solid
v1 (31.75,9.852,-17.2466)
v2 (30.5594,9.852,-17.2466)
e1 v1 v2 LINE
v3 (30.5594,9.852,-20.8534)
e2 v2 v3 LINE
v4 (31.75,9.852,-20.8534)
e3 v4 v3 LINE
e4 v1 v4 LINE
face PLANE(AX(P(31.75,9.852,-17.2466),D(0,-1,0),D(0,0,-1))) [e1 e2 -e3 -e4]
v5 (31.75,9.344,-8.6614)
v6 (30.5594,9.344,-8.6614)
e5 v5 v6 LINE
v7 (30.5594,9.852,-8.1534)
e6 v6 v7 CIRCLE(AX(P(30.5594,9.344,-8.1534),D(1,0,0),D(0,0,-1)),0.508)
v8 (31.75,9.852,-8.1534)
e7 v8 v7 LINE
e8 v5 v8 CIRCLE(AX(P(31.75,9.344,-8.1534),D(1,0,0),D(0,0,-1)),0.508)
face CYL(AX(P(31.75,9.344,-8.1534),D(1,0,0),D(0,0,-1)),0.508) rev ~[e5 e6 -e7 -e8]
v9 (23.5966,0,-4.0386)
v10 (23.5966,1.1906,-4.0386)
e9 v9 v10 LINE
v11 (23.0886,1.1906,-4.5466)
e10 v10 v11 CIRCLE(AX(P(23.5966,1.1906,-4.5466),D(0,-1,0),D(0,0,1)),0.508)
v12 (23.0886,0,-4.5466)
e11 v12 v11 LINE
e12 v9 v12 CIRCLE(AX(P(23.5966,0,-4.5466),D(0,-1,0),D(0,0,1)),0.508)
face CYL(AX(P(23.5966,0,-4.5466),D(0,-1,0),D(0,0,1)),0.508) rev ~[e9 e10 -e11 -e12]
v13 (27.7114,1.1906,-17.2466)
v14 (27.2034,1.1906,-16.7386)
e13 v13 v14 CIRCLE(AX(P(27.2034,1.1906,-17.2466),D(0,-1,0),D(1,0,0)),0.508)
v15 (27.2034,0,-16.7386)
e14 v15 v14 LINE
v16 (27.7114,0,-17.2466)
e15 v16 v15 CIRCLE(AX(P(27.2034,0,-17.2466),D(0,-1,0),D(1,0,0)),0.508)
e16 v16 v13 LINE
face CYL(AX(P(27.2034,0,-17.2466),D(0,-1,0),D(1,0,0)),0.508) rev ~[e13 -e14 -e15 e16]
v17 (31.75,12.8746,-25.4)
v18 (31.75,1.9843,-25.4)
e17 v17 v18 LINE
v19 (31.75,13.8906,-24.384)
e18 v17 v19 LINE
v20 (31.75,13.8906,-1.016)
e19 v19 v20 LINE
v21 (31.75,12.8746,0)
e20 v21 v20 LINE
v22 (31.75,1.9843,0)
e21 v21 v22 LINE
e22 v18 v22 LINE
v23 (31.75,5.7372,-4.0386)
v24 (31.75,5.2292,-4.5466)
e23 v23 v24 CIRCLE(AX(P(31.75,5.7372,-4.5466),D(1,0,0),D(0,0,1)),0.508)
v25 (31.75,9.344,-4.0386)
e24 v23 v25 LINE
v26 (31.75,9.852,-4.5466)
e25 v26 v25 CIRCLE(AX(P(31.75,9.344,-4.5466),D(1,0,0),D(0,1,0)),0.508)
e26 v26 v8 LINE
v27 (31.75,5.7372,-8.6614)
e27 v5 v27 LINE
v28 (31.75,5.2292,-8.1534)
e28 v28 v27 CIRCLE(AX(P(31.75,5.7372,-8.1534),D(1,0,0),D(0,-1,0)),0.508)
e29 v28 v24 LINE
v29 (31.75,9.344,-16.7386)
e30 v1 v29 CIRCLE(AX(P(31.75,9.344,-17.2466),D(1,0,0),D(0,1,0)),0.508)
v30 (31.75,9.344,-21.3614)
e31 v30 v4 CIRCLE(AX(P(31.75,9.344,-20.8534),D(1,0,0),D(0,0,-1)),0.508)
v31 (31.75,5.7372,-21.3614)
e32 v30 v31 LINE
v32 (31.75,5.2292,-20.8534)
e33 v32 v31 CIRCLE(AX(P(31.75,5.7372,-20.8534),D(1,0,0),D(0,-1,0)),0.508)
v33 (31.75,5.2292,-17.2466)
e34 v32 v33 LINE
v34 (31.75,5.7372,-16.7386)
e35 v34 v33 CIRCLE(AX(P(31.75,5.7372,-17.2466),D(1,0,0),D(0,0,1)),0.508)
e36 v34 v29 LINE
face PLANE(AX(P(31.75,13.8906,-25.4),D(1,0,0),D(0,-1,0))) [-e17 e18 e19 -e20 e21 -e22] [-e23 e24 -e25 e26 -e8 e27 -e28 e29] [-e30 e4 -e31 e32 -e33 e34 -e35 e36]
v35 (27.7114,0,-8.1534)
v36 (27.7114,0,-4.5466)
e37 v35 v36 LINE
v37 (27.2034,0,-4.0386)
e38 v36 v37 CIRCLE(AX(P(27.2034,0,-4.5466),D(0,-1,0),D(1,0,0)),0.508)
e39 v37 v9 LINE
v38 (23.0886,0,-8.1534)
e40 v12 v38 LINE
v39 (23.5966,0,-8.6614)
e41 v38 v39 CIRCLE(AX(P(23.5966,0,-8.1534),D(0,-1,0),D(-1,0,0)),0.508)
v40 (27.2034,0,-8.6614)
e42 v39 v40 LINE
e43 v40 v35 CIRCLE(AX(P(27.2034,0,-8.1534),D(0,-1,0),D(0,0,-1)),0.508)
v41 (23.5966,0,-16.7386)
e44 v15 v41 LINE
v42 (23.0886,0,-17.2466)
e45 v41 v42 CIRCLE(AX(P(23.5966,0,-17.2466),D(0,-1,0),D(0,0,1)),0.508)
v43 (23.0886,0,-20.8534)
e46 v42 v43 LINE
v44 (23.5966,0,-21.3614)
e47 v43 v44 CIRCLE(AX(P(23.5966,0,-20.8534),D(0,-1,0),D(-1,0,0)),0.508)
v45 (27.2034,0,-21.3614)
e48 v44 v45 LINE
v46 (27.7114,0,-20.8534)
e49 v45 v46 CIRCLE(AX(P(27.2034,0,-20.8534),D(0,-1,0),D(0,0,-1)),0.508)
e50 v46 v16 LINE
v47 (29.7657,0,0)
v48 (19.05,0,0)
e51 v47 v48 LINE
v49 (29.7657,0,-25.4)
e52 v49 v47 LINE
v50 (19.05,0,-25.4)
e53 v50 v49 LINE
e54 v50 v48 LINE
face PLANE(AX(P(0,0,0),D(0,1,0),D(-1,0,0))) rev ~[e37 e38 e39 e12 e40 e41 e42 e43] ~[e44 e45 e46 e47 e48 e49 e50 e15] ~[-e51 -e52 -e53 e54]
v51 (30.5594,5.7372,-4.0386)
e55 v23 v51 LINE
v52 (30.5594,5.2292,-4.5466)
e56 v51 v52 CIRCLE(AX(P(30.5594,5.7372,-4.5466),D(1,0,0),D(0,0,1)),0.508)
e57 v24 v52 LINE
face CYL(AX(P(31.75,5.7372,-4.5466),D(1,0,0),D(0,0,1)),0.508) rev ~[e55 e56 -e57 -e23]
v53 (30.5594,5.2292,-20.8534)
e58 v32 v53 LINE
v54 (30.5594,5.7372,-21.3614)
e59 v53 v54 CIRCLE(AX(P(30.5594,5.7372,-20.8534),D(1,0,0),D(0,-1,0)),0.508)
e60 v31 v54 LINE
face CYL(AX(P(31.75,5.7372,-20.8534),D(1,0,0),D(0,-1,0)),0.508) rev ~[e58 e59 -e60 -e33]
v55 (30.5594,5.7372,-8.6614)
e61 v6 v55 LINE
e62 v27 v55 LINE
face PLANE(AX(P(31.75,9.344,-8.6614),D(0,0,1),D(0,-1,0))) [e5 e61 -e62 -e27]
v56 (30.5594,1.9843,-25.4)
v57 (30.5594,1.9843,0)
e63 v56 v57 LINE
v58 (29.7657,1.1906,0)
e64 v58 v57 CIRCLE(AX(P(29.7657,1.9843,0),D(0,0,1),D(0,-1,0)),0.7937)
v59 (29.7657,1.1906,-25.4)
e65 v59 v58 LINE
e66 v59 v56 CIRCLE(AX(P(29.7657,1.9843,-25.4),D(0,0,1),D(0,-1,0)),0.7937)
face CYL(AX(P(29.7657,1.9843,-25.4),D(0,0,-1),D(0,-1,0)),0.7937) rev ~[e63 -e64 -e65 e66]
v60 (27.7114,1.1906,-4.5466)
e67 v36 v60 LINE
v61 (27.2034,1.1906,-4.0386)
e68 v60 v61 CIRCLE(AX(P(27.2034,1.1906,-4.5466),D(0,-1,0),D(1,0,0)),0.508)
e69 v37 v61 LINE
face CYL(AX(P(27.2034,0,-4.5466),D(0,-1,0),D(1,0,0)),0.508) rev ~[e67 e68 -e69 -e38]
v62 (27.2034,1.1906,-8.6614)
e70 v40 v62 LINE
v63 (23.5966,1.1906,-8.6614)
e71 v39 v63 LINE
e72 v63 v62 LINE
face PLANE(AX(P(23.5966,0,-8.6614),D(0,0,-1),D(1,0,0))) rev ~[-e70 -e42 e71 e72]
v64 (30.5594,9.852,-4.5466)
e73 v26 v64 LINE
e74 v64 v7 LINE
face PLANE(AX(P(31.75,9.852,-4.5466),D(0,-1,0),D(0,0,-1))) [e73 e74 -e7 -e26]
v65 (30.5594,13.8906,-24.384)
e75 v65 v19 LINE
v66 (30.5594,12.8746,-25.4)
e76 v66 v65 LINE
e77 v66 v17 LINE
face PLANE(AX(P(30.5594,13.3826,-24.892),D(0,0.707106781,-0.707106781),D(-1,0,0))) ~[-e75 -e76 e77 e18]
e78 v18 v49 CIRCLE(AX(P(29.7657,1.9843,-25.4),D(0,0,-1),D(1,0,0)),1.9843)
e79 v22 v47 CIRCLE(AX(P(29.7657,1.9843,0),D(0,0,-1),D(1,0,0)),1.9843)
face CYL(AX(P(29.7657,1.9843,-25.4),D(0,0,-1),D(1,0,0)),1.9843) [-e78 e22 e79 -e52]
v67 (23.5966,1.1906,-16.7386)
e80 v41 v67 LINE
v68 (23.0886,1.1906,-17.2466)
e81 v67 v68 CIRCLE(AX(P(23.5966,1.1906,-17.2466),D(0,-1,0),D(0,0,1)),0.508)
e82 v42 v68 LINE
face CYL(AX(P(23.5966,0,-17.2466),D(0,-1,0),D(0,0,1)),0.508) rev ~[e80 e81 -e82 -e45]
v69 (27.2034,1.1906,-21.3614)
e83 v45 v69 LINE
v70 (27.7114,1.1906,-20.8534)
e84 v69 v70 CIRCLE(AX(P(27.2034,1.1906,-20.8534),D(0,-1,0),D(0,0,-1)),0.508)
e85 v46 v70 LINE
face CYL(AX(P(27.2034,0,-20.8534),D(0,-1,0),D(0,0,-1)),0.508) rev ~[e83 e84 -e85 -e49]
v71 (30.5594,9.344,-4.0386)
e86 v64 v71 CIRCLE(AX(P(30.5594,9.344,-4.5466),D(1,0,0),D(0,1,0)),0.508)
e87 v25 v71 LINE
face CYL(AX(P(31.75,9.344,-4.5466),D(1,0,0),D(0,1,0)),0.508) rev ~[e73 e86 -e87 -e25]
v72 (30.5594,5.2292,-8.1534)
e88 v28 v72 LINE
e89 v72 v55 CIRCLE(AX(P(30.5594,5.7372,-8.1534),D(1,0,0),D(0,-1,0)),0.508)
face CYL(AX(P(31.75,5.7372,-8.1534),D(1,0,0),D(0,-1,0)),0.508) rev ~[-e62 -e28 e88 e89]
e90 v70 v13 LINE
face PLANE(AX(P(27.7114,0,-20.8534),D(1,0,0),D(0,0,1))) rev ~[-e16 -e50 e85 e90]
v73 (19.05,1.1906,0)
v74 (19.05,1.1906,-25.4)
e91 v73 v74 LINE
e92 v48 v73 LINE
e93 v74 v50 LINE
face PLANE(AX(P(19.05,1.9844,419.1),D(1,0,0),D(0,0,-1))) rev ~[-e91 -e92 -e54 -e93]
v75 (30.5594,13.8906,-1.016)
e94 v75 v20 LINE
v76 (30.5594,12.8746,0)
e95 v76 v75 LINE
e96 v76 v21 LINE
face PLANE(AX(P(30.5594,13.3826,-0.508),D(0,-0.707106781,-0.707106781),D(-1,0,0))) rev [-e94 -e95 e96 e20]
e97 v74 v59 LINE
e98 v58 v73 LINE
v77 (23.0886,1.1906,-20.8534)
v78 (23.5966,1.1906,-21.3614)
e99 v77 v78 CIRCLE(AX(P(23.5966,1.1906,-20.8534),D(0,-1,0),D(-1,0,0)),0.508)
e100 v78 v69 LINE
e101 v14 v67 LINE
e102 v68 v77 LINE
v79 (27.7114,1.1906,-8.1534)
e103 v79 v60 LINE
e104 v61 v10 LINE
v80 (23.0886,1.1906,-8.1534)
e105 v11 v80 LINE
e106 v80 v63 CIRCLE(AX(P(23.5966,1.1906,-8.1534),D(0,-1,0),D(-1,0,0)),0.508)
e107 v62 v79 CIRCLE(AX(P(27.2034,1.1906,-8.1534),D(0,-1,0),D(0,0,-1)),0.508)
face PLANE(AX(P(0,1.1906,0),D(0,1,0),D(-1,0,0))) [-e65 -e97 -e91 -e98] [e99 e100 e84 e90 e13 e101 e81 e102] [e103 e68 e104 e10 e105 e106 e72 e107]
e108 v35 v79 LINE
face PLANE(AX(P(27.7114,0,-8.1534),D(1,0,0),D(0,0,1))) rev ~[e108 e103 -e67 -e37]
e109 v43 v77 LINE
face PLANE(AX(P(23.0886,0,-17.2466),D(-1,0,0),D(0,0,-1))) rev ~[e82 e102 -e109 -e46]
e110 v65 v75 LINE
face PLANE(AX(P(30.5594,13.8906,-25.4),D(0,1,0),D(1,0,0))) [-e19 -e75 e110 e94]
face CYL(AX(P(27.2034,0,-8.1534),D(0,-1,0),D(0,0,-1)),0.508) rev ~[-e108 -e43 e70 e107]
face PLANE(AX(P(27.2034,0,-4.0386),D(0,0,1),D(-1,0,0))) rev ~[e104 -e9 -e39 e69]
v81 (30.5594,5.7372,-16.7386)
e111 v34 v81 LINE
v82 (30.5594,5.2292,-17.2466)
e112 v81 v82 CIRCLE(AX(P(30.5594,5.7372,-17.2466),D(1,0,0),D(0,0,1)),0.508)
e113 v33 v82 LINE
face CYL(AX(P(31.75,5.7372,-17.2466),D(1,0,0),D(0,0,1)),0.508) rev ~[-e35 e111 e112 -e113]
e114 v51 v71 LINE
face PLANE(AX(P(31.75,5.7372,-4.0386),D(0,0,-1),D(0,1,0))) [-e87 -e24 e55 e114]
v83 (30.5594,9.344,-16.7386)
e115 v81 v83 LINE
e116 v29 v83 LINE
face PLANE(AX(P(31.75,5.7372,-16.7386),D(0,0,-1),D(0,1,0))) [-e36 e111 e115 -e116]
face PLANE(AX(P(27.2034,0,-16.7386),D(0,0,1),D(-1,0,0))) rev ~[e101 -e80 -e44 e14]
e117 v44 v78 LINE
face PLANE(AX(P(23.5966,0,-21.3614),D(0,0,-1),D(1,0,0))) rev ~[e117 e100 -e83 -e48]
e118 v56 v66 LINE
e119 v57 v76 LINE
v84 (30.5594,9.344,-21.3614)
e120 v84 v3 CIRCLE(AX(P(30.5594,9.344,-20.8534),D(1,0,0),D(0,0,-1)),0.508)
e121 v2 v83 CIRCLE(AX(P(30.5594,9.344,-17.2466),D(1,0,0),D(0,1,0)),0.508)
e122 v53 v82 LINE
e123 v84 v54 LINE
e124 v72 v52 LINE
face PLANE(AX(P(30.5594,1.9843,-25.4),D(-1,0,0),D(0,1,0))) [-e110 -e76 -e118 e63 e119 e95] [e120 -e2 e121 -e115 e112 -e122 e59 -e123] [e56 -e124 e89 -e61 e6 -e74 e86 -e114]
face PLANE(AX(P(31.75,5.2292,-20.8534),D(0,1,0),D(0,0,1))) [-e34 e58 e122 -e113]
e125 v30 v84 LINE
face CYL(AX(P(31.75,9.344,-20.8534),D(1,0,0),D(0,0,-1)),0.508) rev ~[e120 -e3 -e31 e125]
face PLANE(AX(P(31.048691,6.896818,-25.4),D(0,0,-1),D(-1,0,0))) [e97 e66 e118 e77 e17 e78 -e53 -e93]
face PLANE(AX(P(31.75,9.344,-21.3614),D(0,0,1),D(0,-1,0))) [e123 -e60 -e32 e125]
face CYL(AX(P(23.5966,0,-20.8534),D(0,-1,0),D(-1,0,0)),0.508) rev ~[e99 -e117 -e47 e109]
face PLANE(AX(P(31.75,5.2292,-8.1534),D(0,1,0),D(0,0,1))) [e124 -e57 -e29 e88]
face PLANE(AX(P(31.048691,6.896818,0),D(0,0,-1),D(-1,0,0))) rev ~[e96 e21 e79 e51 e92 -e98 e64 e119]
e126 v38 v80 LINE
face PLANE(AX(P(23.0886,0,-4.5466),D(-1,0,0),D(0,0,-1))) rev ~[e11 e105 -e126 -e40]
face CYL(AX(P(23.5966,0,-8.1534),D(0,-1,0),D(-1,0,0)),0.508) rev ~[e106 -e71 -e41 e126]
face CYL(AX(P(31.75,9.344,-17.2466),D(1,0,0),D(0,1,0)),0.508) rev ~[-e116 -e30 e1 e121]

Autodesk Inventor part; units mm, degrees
ref_plane "YZ Plane" through (0, 0, 0) normal (1, 0, 0) x (0, 1, 0)
ref_plane "XZ Plane" through (0, 0, 0) normal (0, 1, 0) x (-1, 0, 0)
sketch "Sketch1" plane through (0, 0, 0) normal (0, 1, 0) x (-1, 0, 0)
  line L0 (-31.75, 0) -> (31.75, 0)
  line L1 (31.75, 0) -> (31.75, -25.4)
  line L2 (31.75, -25.4) -> (-31.75, -25.4)
  line L3 (-31.75, -25.4) -> (-31.75, 0)
  line L4 (31.75, 0) -> (-31.75, -25.4) construction
  point P0 (0, 0)
  point P1 (0, 0)
  dimension "d0" = 63.5
  dimension "d1" = 25.4
extrude "Plate1" add sketch "Sketch1" along normal blind 1.1906
sketch "Sketch2" plane through (30.5594, 0, -25.4) normal (1, 0, 0) x (0, 1, 0)
  line L0 (0, 25.4) -> (0, 0)
  line L1 (0, 0) -> (13.8906, 0)
  line L2 (13.8906, 0) -> (13.8906, 25.4)
  line L3 (13.8906, 25.4) -> (0, 25.4)
edge flange "Flanges" height 12.7 angle 90 thickness 1.1906 bend radius 0.7937 thickness toward (1, 0, 0) relief tear relief width 1.1906 relief depth 0.5953 corner gap 1.1906 corner form 0 edges at (31.75, 1.1906, -12.7) (-31.75, 1.1906, -12.7) wall of the first edge with corners at (30.5594, 0, 0) (30.5594, 0, -25.4) (30.5594, 13.8906, -25.4) (30.5594, 13.8906, 0)
bend "Bend1"
corner "Corner1"
sketch "Sketch3" plane through (31.75, 1.9844, -25.4) normal (1, 0, 0) x (0, 0, -1)
  line L0 (-20.8534, 7.8676) -> (-17.2466, 7.8676)
  line L1 (-16.7386, 7.3596) -> (-16.7386, 3.7528)
  line L2 (-17.2466, 3.2448) -> (-20.8534, 3.2448)
  line L3 (-21.3614, 3.7528) -> (-21.3614, 7.3596)
  arc A0 (-20.8534, 7.8676) -> (-21.3614, 7.3596) centre (-20.8534, 7.3596) ccw
  arc A1 (-16.7386, 7.3596) -> (-17.2466, 7.8676) centre (-17.2466, 7.3596) ccw
  arc A2 (-17.2466, 3.2448) -> (-16.7386, 3.7528) centre (-17.2466, 3.7528) ccw
  arc A3 (-21.3614, 3.7528) -> (-20.8534, 3.2448) centre (-20.8534, 3.7528) ccw
  line L4 (-25.4, 0) -> (-25.4, 11.9062) construction
  line L5 (-25.4, 11.9062) -> (0, 11.9063) construction
  line L6 (-20.8534, 7.3596) -> (-17.2466, 3.7528) construction
  point P0 (-25.4, -1.9844)
  point P1 (-16.7386, 3.2448)
  point P2 (-21.3614, 3.2448)
  point P3 (-19.05, 5.5562)
  dimension "d16" = 4.6228
  dimension "d17" = 0.508
  dimension "d20" = 6.35
  dimension "d21" = 6.35
extrude "Flange Stamp" cut sketch "Sketch3" against normal blind 1.1906
sketch "Sketch7" plane through (31.75, 1.9844, 0) normal (1, 0, 0) x (0, 0, -1)
  arc A0 (4.5466, 7.8676) -> (4.0386, 7.3596) centre (4.5466, 7.3596) ccw construction
  arc A1 (8.1534, 3.2448) -> (8.6614, 3.7528) centre (8.1534, 3.7528) ccw construction
  circle A2 centre (6.35, 5.5563) radius 2.1844
  line L0 (4.5466, 7.3596) -> (8.1534, 3.7528) construction
  point P0 (0, -1.9844)
  dimension "d46" = 4.3688
surface extrude "Flange Circle" sketch "Sketch7" against normal up to surface (1.1906 mm away) shown yes curves A2
ref_plane "Flange Pattern Plane" through (31.75, 7.5406, -4.5466) normal (0, 1, 0) x (1, 0, 0)
sketch "Flange Pattern Sketch" plane through (31.75, 7.5406, -4.5466) normal (0, 1, 0) x (1, 0, 0)
  line L0 (0, 3.6068) -> (0, 0) construction
  line L1 (-76.2822, -4.5466) -> (13.1932, -4.5466) construction
  line L2 (0, 0) -> (-1.1906, 0) construction
  point P0 (-31.75, -4.5466)
  point P1 (0, 1.8034)
  point P2 (0, 14.5034)
  dimension "d131" = 12.7
  dimension "d134" = 12.7
pattern_sketch "Flange Pattern" of "Flange Circle", "Flange Stamp" from (31.75, 7.5406, -6.35) copies at (31.75, 7.5406, -19.05)
sketch "Sketch8" plane through (0, 0, 0) normal (0, -1, 0) x (1, 0, 0)
  line L0 (29.7656, 0) -> (-29.7656, 0) construction
  line L1 (27.2034, -4.0386) -> (23.5966, -4.0386)
  line L2 (23.0886, -4.5466) -> (23.0886, -8.1534)
  line L3 (23.5966, -8.6614) -> (27.2034, -8.6614)
  line L4 (27.7114, -8.1534) -> (27.7114, -4.5466)
  arc A0 (27.7114, -4.5466) -> (27.2034, -4.0386) centre (27.2034, -4.5466) ccw
  arc A1 (27.2034, -8.6614) -> (27.7114, -8.1534) centre (27.2034, -8.1534) ccw
  arc A2 (23.0886, -8.1534) -> (23.5966, -8.6614) centre (23.5966, -8.1534) ccw
  arc A3 (23.5966, -4.0386) -> (23.0886, -4.5466) centre (23.5966, -4.5466) ccw
  line L5 (27.2034, -4.5466) -> (23.5966, -8.1534) construction
  line L6 (31.75, 0) -> (31.75, -25.4) construction
  point P0 (0, 0)
  point P1 (23.0886, -8.6614)
  point P2 (27.7114, -8.6614)
  point P3 (25.4, -6.35)
  dimension "d49" = 4.6228
  dimension "d50" = 0.508
  dimension "d51" = 6.35
  dimension "d52" = 6.35
extrude "Body Stamp" cut sketch "Sketch8" against normal blind 1.1906
sketch "Sketch9" plane through (0, 0, 0) normal (0, -1, 0) x (1, 0, 0)
  arc A0 (27.7114, -4.5466) -> (27.2034, -4.0386) centre (27.2034, -4.5466) ccw construction
  arc A1 (23.0886, -8.1534) -> (23.5966, -8.6614) centre (23.5966, -8.1534) ccw construction
  line L0 (27.2034, -4.5466) -> (23.5966, -8.1534) construction
  circle A2 centre (25.4, -6.35) radius 2.1844
  point P0 (0, 0)
  dimension "d55" = 4.3688
surface extrude "Body Circle" sketch "Sketch9" against normal up to surface (1.1906 mm away) shown yes curves A2
sketch "Body Pattern Sketch" plane through (0, 0, 0) normal (0, -1, 0) x (1, 0, 0)
  line L0 (29.7656, 0) -> (-29.7656, 0) construction
  line L1 (31.75, 0) -> (31.75, -25.4) construction
  circle A0 centre (25.4, -6.35) radius 2.1844 construction
  point P0 (0, 0)
  point P1 (25.4, -19.05)
  dimension "d62" = 12.7
  dimension "d65" = 12.7
  dimension "d139" = 12.7
pattern_sketch "Body Pattern" of "Body Stamp", "Body Circle" from (25.4, 0, -6.35) copies at (25.4, 0, -19.05)
sketch "Arc Length" plane through (30.5594, 1.9844, 0) normal (0, 0, 1) x (1, 0, 0)
  line L0 (0, 0) -> (1.1906, 0) construction
  arc A0 (-0.7938, -0.7938) -> (0, 0) centre (-0.7938, 0) ccw construction
  line L1 (-0.7938, -1.9844) -> (-0.7938, -0.7938) construction
  arc A1 (-0.7938, -1.9844) -> (1.1906, 0) centre (-0.7938, 0) ccw construction
  point P0 (-30.5594, -1.9844)
  dimension "d85" = 3.117
  dimension "d92" = 1.2468
sketch "Sketch13" plane through (31.75, 13.8906, 0) normal (1, 0, 0) x (0, 0, -1)
  line L0 (0, 0) -> (25.4, 0) construction
  line L1 (62.4078, 0) -> (63.4238, -1.016)
  line L2 (63.4238, -1.016) -> (64.4398, 0)
  line L3 (62.4078, 0) -> (64.4398, 0)
  line L4 (25.4, -11.9063) -> (0, -11.9063) construction
  line L5 (63.4238, -10.8903) -> (61.3168, -12.9972)
  line L6 (61.3168, -12.9972) -> (63.4238, -15.1042)
  line L7 (63.4238, -15.1042) -> (65.5308, -12.9972)
  line L8 (65.5308, -12.9972) -> (63.4238, -10.8903)
  line L9 (63.4238, -10.8903) -> (63.4238, -15.1042) construction
  line L10 (63.4238, -1.016) -> (63.4238, -10.8903) construction
  line L11 (0, -11.9063) -> (25.4, -11.9063) construction
  point P0 (0, -13.8906)
  dimension "d86" = 4.2139
  dimension "d88" = 1.016
  dimension "d91" = 1.016
  dimension "d102" = 63.4238
feature "Notch" [suppressed]
mirror "Notch Mirror" [suppressed]
pattern_linear "Notch Pattern" [suppressed]
chamfer "End Chamfer" distance 1.016 angle 45 4 edges at (-31.1547, 13.8906, -25.4) (31.1547, 13.8906, -25.4) (-31.1547, 13.8906, 0) (31.1547, 13.8906, 0)
sketch "Sketch14" plane through (-31.75, 1.9844, 419.1) normal (1, 0, 0) x (0, 0, -1)
  line L0 (419.1, 11.9063) -> (444.5, 11.9063) construction
  line L1 (419.1, 0) -> (419.1, 11.9063) construction
  line L2 (419.1, -1.9844) -> (444.5, -1.9844) construction
  line L3 (419.1, 11.9063) -> (444.5, 11.9063)
  line L4 (444.5, 11.9063) -> (444.5, -1.9844)
  line L5 (444.5, -1.9844) -> (419.1, -1.9844)
  line L6 (419.1, -1.9844) -> (419.1, 11.9063)
  point P0 (382.0521, -1.9844)
extrude "Half Cut" cut sketch "Sketch14" along normal blind 50.8
equation "\"d1\" = 12.7 * Length"
equation "\"d18\" = Thickness"
equation "\"d53\" = Thickness"
equation "\"d89\" = Thickness"
equation "\"d2\" = Thickness"
equation "\"d3\" = BendReliefWidth"
equation "\"d4\" = BendReliefDepth"
equation "\"d5\" = MinimumRemnant"
equation "\"d6\" = TransitionRadius"
equation "\"d10\" = CornerReliefSize"
equation "\"d11\" = GapSize"
equation "\"d12\" = JacobiRadiusSize"
equation "\"BendRadius\" = Thickness"
equation "\"BendReliefWidth\" = Thickness"
equation "\"BendReliefDepth\" = 0.5 * Thickness"
equation "\"CornerReliefSize\" = 4 * Thickness"
equation "\"MinimumRemnant\" = 2 * Thickness"
equation "\"TransitionRadius\" = BendRadius"
equation "\"JacobiRadiusSize\" = BendRadius"
equation "\"GapSize\" = Thickness"
equation "\"Length\" = 2"
equation "\"Thickness\" = 1.190625"
properties part number "Alu C 1x3x1x35"
